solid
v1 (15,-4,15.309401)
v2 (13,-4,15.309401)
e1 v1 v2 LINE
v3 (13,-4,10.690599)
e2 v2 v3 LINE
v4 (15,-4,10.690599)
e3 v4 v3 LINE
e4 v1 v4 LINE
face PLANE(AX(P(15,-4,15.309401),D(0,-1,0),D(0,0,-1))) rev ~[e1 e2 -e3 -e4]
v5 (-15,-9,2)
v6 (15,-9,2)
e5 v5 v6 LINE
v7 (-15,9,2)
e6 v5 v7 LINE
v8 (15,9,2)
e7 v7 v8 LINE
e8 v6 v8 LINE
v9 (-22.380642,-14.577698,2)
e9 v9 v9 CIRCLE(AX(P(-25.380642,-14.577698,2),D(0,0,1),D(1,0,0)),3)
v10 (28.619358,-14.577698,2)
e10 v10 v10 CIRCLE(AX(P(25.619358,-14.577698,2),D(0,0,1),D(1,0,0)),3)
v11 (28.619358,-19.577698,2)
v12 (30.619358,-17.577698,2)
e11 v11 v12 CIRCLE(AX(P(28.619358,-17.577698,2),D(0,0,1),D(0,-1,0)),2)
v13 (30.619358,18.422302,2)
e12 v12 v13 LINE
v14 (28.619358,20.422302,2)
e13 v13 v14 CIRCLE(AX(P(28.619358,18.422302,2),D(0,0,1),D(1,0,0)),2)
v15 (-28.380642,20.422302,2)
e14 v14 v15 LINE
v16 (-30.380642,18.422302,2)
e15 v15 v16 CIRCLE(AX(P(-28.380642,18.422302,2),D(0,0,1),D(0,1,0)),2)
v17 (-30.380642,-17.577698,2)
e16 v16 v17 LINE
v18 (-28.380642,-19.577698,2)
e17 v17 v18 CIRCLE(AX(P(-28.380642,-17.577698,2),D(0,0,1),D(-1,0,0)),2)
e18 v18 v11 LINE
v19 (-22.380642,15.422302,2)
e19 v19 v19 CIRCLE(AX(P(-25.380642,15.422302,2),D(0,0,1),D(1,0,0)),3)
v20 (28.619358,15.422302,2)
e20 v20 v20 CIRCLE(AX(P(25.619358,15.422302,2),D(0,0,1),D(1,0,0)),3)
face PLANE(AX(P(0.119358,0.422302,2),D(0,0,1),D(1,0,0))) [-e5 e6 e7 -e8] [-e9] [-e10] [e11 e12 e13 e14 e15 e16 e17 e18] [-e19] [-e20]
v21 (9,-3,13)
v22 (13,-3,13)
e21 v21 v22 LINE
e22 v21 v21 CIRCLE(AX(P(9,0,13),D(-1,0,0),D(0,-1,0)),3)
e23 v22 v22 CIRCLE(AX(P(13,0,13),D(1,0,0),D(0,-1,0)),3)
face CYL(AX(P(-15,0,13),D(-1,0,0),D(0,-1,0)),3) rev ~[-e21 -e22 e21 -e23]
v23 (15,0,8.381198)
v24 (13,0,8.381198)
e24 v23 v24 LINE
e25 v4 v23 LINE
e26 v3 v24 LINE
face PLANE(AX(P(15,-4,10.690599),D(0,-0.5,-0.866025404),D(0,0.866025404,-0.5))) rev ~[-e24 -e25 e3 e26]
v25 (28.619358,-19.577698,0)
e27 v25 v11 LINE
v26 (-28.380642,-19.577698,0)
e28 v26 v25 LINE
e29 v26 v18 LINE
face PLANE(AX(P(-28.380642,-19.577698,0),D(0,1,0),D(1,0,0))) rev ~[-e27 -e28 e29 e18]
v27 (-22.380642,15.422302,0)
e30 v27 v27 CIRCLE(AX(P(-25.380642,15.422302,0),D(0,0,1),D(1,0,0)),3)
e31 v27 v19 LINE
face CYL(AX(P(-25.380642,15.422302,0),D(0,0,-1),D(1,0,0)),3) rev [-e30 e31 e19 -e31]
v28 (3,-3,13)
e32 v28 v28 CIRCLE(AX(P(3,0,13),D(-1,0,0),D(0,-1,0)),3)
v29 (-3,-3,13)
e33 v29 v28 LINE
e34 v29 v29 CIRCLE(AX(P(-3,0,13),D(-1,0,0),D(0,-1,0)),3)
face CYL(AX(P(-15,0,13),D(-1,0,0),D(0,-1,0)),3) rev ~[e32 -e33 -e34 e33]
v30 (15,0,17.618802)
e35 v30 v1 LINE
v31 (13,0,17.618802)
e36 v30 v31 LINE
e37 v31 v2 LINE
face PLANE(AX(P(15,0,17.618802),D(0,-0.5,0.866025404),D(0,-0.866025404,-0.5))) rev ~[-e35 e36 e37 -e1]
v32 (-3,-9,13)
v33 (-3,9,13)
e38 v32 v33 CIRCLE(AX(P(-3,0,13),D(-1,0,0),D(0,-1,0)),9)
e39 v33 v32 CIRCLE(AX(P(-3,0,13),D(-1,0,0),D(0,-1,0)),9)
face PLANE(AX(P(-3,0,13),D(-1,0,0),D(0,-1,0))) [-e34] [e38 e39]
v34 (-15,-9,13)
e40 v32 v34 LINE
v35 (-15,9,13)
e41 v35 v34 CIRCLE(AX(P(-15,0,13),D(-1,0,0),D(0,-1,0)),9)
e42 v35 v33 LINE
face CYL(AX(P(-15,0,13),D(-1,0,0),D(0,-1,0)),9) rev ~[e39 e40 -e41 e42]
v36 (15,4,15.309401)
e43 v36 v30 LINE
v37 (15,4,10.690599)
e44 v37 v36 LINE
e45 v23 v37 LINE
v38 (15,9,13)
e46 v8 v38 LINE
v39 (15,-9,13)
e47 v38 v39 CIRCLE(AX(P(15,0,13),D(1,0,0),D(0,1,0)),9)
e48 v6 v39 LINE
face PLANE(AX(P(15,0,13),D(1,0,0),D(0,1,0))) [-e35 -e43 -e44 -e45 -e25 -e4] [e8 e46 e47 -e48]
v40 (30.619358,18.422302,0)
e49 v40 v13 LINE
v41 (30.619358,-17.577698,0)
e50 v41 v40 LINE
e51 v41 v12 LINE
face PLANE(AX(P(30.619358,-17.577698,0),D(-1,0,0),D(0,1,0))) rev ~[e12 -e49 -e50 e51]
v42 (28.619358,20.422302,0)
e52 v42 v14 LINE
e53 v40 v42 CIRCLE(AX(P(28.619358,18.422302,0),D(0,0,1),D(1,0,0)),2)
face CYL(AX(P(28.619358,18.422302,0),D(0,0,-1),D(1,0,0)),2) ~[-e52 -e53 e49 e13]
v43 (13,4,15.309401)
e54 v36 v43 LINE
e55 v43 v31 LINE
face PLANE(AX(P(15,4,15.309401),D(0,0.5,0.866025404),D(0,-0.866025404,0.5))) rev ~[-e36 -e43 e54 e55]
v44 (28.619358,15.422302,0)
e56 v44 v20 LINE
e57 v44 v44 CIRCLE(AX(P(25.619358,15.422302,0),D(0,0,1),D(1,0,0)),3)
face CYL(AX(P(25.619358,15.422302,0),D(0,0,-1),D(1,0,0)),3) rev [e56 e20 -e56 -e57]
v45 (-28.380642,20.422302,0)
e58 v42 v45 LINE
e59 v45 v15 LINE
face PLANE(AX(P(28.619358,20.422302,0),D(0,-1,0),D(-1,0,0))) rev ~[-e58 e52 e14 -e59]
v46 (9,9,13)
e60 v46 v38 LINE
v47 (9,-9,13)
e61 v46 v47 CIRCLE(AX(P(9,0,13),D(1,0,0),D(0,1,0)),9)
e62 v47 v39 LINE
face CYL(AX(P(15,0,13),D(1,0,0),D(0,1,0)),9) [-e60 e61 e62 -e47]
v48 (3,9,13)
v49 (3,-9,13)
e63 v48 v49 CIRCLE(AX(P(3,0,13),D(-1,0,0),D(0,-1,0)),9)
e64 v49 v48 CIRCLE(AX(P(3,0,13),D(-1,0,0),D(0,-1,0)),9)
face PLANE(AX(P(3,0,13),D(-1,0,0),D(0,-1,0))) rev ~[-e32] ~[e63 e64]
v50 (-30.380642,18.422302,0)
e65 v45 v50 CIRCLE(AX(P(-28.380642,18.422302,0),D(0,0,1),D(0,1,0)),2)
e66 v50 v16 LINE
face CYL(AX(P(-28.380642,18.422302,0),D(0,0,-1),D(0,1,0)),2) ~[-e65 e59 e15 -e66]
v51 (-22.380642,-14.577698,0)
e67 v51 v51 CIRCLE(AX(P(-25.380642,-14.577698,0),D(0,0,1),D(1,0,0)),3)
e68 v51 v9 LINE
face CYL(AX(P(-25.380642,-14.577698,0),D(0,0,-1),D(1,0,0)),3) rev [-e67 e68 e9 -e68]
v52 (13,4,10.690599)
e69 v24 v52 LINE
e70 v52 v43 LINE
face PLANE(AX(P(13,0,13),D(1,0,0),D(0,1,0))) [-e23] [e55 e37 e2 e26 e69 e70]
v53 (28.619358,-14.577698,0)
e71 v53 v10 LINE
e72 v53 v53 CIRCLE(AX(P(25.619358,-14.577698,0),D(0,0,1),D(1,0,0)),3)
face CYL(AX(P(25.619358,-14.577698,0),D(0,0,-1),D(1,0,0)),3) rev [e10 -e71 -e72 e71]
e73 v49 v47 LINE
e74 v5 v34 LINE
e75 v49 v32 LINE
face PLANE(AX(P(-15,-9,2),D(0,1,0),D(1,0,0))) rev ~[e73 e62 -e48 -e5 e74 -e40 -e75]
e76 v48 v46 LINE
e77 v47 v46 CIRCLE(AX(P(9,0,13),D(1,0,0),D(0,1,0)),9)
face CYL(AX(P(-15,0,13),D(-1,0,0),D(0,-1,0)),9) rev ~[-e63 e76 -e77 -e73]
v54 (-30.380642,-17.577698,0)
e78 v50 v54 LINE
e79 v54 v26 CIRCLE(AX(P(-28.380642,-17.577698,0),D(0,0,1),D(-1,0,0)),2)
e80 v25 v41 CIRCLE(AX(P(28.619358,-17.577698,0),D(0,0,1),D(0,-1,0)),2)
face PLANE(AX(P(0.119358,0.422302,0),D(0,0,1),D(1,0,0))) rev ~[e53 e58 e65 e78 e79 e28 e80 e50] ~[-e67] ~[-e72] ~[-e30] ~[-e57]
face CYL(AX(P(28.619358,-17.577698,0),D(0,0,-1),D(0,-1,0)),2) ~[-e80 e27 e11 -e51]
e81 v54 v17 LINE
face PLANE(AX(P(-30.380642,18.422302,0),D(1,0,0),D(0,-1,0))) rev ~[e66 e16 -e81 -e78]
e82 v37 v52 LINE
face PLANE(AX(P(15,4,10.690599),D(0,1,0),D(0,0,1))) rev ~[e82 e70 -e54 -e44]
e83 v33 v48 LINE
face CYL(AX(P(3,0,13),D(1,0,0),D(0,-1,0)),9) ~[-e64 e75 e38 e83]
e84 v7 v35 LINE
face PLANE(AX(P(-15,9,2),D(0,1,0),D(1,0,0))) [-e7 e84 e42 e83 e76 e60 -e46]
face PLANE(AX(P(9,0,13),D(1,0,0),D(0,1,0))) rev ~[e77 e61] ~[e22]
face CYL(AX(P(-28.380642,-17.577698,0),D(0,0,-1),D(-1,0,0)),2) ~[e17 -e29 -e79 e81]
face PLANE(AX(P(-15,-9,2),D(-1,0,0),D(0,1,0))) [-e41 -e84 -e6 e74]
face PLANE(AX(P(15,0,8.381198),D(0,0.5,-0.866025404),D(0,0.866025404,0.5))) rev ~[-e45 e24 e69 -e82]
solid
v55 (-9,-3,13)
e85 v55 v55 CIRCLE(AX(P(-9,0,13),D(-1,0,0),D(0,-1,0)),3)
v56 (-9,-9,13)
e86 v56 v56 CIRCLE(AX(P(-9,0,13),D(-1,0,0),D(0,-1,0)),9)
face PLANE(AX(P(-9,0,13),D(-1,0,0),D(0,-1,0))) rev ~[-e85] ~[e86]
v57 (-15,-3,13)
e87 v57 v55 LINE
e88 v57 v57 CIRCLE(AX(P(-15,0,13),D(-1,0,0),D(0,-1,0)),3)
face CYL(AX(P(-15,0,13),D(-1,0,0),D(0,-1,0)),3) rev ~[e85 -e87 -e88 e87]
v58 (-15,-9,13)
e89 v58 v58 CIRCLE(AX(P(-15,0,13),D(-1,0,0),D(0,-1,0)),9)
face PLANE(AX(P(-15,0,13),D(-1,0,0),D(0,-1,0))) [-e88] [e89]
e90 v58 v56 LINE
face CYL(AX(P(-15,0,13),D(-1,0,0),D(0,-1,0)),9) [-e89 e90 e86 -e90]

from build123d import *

# Parameters (mm, degrees)
F0_R      = 3
F1_DEPTH  = 2
F2_W      = 30
F2_H      = 18
F3_DEPTH  = 20
F6_DEPTH  = 30
F7_R      = 9
F8_DEPTH  = 30
F10_R     = 9
F11_DEPTH = 6
F13_START = 6
F12_R     = 9
F13_DEPTH = 12
F14_DEPTH = 6
F15_DEPTH = 6
F16_R     = 3
F17_DEPTH = 30
F18_R     = 3
F19_DEPTH = 2


# Not quite as in the source:
# - a feature names something its author has since deleted; it is built from what else it names


with BuildPart() as f1:
    # F0 (on Top) → F1 (new body)
    with BuildSketch(Plane.XY):
        with BuildLine():
            Line((28.6193578921, 20.4223022205), (-28.3806421079, 20.4223022205))
            ThreePointArc((-28.3806421079, 20.4223022205), (-29.7948556703, 19.8365157828), (-30.3806421079, 18.4223022205))
            Line((-30.3806421079, 18.4223022205), (-30.3806421079, -17.5776977795))
            ThreePointArc((-30.3806421079, -17.5776977795), (-29.7948556703, -18.9919113419), (-28.3806421079, -19.5776977795))
            Line((-28.3806421079, -19.5776977795), (28.6193578921, -19.5776977795))
            ThreePointArc((28.6193578921, -19.5776977795), (30.0335714544, -18.9919113419), (30.6193578921, -17.5776977795))
            Line((30.6193578921, -17.5776977795), (30.6193578921, 18.4223022205))
            ThreePointArc((30.6193578921, 18.4223022205), (30.0335714544, 19.8365157828), (28.6193578921, 20.4223022205))
        make_face()
        with Locations((-25.3806421079, -14.5776977795)):
            Circle(F0_R, mode=Mode.SUBTRACT)
        with Locations((25.6193578921, -14.5776977795)):
            Circle(F0_R, mode=Mode.SUBTRACT)
        with Locations((-25.3806421079, 15.4223022205)):
            Circle(F0_R, mode=Mode.SUBTRACT)
        with Locations((25.6193578921, 15.4223022205)):
            Circle(F0_R, mode=Mode.SUBTRACT)
    extrude(amount=F1_DEPTH)

    # F2 (on face) → F3 (join)
    with BuildSketch(Plane.XY.offset(2)):
        Rectangle(F2_W, F2_H)
    extrude(amount=F3_DEPTH)

    # F5 (on face) + F4 (on face) → F6 (cut)
    with BuildSketch(Plane(origin=(-15, 0, 0), x_dir=(0, -1, 0), z_dir=(-1, 0, 0))):
        with BuildLine():
            Line((9, 22), (0, 22))
            ThreePointArc((0, 22), (6.3639610307, 19.3639610307), (9, 13))
            Line((9, 13), (9, 22))
        make_face()
    with BuildSketch(Plane(origin=(-15, 0, 0), x_dir=(0, -1, 0), z_dir=(-1, 0, 0))):
        with BuildLine():
            ThreePointArc((-9, 13), (-6.3639610307, 19.3639610307), (0, 22))
            Line((0, 22), (-9, 22))
            Line((-9, 22), (-9, 13))
        make_face()
    extrude(amount=-F6_DEPTH, mode=Mode.SUBTRACT)

    # F7 (on face) → F8 (cut)
    with BuildSketch(Plane(origin=(-15, 0, 0), x_dir=(0, -1, 0), z_dir=(-1, 0, 0))):
        with Locations((0, 13)):
            Circle(F7_R)
    extrude(amount=-F8_DEPTH, mode=Mode.SUBTRACT)

    # F10 (on face) → F11 (join)
    with BuildSketch(Plane.YZ.offset(15)):
        with Locations((0, 13)):
            Circle(F10_R)
    extrude(amount=-F11_DEPTH)

    # F12 (on face) → F13 (join)
    with BuildSketch(Plane(origin=(9, 0, 0), x_dir=(0, -1, 0), z_dir=(-1, 0, 0)).offset(F13_START)):
        with Locations((0, 13)):
            Circle(F12_R)
    extrude(amount=F13_DEPTH)

    # F14 (cut): a face of the model
    f14_faces = [f1.faces().sort_by_distance(p)[0] for p in [
        (-9, 0, 13),
    ]]
    extrude(f14_faces, amount=-F14_DEPTH, mode=Mode.SUBTRACT)


with BuildPart() as f15:
    # F9 (on face) → F15 (new body)
    with BuildSketch(Plane(origin=(-15, 0, 0), x_dir=(0, -1, 0), z_dir=(-1, 0, 0))):
        with BuildLine():
            ThreePointArc((-9, 13), (0, 4), (9, 13))
            ThreePointArc((9, 13), (0, 22), (-9, 13))
        make_face()
    extrude(amount=-F15_DEPTH)


with BuildPart() as f17_tool:
    # F16 (on face) → F17 (new body)
    with BuildSketch(Plane(origin=(-15, 0, 0), x_dir=(0, -1, 0), z_dir=(-1, 0, 0))):
        with Locations((0, 13)):
            Circle(F16_R)
    extrude(amount=-F17_DEPTH)


with BuildPart() as f1_1:
    add(f1.part)

    # F17: cut by f17_tool
    add(f17_tool.part, mode=Mode.SUBTRACT)

    # F18 (on face) → F19 (cut)
    with BuildSketch(Plane.YZ.offset(15)):
        Polygon((4, 10.6905989232), (4, 15.3094010768), (0, 17.6188021535), (-4, 15.3094010768), (-4, 10.6905989232), (0, 8.3811978465), align=None)
        with Locations((0, 13)):
            Circle(F18_R, mode=Mode.SUBTRACT)
    extrude(amount=-F19_DEPTH, mode=Mode.SUBTRACT)


with BuildPart() as f15_1:
    add(f15.part)

    # F17: cut by f17_tool
    add(f17_tool.part, mode=Mode.SUBTRACT)


solid = Compound([f1_1.part, f15_1.part])
